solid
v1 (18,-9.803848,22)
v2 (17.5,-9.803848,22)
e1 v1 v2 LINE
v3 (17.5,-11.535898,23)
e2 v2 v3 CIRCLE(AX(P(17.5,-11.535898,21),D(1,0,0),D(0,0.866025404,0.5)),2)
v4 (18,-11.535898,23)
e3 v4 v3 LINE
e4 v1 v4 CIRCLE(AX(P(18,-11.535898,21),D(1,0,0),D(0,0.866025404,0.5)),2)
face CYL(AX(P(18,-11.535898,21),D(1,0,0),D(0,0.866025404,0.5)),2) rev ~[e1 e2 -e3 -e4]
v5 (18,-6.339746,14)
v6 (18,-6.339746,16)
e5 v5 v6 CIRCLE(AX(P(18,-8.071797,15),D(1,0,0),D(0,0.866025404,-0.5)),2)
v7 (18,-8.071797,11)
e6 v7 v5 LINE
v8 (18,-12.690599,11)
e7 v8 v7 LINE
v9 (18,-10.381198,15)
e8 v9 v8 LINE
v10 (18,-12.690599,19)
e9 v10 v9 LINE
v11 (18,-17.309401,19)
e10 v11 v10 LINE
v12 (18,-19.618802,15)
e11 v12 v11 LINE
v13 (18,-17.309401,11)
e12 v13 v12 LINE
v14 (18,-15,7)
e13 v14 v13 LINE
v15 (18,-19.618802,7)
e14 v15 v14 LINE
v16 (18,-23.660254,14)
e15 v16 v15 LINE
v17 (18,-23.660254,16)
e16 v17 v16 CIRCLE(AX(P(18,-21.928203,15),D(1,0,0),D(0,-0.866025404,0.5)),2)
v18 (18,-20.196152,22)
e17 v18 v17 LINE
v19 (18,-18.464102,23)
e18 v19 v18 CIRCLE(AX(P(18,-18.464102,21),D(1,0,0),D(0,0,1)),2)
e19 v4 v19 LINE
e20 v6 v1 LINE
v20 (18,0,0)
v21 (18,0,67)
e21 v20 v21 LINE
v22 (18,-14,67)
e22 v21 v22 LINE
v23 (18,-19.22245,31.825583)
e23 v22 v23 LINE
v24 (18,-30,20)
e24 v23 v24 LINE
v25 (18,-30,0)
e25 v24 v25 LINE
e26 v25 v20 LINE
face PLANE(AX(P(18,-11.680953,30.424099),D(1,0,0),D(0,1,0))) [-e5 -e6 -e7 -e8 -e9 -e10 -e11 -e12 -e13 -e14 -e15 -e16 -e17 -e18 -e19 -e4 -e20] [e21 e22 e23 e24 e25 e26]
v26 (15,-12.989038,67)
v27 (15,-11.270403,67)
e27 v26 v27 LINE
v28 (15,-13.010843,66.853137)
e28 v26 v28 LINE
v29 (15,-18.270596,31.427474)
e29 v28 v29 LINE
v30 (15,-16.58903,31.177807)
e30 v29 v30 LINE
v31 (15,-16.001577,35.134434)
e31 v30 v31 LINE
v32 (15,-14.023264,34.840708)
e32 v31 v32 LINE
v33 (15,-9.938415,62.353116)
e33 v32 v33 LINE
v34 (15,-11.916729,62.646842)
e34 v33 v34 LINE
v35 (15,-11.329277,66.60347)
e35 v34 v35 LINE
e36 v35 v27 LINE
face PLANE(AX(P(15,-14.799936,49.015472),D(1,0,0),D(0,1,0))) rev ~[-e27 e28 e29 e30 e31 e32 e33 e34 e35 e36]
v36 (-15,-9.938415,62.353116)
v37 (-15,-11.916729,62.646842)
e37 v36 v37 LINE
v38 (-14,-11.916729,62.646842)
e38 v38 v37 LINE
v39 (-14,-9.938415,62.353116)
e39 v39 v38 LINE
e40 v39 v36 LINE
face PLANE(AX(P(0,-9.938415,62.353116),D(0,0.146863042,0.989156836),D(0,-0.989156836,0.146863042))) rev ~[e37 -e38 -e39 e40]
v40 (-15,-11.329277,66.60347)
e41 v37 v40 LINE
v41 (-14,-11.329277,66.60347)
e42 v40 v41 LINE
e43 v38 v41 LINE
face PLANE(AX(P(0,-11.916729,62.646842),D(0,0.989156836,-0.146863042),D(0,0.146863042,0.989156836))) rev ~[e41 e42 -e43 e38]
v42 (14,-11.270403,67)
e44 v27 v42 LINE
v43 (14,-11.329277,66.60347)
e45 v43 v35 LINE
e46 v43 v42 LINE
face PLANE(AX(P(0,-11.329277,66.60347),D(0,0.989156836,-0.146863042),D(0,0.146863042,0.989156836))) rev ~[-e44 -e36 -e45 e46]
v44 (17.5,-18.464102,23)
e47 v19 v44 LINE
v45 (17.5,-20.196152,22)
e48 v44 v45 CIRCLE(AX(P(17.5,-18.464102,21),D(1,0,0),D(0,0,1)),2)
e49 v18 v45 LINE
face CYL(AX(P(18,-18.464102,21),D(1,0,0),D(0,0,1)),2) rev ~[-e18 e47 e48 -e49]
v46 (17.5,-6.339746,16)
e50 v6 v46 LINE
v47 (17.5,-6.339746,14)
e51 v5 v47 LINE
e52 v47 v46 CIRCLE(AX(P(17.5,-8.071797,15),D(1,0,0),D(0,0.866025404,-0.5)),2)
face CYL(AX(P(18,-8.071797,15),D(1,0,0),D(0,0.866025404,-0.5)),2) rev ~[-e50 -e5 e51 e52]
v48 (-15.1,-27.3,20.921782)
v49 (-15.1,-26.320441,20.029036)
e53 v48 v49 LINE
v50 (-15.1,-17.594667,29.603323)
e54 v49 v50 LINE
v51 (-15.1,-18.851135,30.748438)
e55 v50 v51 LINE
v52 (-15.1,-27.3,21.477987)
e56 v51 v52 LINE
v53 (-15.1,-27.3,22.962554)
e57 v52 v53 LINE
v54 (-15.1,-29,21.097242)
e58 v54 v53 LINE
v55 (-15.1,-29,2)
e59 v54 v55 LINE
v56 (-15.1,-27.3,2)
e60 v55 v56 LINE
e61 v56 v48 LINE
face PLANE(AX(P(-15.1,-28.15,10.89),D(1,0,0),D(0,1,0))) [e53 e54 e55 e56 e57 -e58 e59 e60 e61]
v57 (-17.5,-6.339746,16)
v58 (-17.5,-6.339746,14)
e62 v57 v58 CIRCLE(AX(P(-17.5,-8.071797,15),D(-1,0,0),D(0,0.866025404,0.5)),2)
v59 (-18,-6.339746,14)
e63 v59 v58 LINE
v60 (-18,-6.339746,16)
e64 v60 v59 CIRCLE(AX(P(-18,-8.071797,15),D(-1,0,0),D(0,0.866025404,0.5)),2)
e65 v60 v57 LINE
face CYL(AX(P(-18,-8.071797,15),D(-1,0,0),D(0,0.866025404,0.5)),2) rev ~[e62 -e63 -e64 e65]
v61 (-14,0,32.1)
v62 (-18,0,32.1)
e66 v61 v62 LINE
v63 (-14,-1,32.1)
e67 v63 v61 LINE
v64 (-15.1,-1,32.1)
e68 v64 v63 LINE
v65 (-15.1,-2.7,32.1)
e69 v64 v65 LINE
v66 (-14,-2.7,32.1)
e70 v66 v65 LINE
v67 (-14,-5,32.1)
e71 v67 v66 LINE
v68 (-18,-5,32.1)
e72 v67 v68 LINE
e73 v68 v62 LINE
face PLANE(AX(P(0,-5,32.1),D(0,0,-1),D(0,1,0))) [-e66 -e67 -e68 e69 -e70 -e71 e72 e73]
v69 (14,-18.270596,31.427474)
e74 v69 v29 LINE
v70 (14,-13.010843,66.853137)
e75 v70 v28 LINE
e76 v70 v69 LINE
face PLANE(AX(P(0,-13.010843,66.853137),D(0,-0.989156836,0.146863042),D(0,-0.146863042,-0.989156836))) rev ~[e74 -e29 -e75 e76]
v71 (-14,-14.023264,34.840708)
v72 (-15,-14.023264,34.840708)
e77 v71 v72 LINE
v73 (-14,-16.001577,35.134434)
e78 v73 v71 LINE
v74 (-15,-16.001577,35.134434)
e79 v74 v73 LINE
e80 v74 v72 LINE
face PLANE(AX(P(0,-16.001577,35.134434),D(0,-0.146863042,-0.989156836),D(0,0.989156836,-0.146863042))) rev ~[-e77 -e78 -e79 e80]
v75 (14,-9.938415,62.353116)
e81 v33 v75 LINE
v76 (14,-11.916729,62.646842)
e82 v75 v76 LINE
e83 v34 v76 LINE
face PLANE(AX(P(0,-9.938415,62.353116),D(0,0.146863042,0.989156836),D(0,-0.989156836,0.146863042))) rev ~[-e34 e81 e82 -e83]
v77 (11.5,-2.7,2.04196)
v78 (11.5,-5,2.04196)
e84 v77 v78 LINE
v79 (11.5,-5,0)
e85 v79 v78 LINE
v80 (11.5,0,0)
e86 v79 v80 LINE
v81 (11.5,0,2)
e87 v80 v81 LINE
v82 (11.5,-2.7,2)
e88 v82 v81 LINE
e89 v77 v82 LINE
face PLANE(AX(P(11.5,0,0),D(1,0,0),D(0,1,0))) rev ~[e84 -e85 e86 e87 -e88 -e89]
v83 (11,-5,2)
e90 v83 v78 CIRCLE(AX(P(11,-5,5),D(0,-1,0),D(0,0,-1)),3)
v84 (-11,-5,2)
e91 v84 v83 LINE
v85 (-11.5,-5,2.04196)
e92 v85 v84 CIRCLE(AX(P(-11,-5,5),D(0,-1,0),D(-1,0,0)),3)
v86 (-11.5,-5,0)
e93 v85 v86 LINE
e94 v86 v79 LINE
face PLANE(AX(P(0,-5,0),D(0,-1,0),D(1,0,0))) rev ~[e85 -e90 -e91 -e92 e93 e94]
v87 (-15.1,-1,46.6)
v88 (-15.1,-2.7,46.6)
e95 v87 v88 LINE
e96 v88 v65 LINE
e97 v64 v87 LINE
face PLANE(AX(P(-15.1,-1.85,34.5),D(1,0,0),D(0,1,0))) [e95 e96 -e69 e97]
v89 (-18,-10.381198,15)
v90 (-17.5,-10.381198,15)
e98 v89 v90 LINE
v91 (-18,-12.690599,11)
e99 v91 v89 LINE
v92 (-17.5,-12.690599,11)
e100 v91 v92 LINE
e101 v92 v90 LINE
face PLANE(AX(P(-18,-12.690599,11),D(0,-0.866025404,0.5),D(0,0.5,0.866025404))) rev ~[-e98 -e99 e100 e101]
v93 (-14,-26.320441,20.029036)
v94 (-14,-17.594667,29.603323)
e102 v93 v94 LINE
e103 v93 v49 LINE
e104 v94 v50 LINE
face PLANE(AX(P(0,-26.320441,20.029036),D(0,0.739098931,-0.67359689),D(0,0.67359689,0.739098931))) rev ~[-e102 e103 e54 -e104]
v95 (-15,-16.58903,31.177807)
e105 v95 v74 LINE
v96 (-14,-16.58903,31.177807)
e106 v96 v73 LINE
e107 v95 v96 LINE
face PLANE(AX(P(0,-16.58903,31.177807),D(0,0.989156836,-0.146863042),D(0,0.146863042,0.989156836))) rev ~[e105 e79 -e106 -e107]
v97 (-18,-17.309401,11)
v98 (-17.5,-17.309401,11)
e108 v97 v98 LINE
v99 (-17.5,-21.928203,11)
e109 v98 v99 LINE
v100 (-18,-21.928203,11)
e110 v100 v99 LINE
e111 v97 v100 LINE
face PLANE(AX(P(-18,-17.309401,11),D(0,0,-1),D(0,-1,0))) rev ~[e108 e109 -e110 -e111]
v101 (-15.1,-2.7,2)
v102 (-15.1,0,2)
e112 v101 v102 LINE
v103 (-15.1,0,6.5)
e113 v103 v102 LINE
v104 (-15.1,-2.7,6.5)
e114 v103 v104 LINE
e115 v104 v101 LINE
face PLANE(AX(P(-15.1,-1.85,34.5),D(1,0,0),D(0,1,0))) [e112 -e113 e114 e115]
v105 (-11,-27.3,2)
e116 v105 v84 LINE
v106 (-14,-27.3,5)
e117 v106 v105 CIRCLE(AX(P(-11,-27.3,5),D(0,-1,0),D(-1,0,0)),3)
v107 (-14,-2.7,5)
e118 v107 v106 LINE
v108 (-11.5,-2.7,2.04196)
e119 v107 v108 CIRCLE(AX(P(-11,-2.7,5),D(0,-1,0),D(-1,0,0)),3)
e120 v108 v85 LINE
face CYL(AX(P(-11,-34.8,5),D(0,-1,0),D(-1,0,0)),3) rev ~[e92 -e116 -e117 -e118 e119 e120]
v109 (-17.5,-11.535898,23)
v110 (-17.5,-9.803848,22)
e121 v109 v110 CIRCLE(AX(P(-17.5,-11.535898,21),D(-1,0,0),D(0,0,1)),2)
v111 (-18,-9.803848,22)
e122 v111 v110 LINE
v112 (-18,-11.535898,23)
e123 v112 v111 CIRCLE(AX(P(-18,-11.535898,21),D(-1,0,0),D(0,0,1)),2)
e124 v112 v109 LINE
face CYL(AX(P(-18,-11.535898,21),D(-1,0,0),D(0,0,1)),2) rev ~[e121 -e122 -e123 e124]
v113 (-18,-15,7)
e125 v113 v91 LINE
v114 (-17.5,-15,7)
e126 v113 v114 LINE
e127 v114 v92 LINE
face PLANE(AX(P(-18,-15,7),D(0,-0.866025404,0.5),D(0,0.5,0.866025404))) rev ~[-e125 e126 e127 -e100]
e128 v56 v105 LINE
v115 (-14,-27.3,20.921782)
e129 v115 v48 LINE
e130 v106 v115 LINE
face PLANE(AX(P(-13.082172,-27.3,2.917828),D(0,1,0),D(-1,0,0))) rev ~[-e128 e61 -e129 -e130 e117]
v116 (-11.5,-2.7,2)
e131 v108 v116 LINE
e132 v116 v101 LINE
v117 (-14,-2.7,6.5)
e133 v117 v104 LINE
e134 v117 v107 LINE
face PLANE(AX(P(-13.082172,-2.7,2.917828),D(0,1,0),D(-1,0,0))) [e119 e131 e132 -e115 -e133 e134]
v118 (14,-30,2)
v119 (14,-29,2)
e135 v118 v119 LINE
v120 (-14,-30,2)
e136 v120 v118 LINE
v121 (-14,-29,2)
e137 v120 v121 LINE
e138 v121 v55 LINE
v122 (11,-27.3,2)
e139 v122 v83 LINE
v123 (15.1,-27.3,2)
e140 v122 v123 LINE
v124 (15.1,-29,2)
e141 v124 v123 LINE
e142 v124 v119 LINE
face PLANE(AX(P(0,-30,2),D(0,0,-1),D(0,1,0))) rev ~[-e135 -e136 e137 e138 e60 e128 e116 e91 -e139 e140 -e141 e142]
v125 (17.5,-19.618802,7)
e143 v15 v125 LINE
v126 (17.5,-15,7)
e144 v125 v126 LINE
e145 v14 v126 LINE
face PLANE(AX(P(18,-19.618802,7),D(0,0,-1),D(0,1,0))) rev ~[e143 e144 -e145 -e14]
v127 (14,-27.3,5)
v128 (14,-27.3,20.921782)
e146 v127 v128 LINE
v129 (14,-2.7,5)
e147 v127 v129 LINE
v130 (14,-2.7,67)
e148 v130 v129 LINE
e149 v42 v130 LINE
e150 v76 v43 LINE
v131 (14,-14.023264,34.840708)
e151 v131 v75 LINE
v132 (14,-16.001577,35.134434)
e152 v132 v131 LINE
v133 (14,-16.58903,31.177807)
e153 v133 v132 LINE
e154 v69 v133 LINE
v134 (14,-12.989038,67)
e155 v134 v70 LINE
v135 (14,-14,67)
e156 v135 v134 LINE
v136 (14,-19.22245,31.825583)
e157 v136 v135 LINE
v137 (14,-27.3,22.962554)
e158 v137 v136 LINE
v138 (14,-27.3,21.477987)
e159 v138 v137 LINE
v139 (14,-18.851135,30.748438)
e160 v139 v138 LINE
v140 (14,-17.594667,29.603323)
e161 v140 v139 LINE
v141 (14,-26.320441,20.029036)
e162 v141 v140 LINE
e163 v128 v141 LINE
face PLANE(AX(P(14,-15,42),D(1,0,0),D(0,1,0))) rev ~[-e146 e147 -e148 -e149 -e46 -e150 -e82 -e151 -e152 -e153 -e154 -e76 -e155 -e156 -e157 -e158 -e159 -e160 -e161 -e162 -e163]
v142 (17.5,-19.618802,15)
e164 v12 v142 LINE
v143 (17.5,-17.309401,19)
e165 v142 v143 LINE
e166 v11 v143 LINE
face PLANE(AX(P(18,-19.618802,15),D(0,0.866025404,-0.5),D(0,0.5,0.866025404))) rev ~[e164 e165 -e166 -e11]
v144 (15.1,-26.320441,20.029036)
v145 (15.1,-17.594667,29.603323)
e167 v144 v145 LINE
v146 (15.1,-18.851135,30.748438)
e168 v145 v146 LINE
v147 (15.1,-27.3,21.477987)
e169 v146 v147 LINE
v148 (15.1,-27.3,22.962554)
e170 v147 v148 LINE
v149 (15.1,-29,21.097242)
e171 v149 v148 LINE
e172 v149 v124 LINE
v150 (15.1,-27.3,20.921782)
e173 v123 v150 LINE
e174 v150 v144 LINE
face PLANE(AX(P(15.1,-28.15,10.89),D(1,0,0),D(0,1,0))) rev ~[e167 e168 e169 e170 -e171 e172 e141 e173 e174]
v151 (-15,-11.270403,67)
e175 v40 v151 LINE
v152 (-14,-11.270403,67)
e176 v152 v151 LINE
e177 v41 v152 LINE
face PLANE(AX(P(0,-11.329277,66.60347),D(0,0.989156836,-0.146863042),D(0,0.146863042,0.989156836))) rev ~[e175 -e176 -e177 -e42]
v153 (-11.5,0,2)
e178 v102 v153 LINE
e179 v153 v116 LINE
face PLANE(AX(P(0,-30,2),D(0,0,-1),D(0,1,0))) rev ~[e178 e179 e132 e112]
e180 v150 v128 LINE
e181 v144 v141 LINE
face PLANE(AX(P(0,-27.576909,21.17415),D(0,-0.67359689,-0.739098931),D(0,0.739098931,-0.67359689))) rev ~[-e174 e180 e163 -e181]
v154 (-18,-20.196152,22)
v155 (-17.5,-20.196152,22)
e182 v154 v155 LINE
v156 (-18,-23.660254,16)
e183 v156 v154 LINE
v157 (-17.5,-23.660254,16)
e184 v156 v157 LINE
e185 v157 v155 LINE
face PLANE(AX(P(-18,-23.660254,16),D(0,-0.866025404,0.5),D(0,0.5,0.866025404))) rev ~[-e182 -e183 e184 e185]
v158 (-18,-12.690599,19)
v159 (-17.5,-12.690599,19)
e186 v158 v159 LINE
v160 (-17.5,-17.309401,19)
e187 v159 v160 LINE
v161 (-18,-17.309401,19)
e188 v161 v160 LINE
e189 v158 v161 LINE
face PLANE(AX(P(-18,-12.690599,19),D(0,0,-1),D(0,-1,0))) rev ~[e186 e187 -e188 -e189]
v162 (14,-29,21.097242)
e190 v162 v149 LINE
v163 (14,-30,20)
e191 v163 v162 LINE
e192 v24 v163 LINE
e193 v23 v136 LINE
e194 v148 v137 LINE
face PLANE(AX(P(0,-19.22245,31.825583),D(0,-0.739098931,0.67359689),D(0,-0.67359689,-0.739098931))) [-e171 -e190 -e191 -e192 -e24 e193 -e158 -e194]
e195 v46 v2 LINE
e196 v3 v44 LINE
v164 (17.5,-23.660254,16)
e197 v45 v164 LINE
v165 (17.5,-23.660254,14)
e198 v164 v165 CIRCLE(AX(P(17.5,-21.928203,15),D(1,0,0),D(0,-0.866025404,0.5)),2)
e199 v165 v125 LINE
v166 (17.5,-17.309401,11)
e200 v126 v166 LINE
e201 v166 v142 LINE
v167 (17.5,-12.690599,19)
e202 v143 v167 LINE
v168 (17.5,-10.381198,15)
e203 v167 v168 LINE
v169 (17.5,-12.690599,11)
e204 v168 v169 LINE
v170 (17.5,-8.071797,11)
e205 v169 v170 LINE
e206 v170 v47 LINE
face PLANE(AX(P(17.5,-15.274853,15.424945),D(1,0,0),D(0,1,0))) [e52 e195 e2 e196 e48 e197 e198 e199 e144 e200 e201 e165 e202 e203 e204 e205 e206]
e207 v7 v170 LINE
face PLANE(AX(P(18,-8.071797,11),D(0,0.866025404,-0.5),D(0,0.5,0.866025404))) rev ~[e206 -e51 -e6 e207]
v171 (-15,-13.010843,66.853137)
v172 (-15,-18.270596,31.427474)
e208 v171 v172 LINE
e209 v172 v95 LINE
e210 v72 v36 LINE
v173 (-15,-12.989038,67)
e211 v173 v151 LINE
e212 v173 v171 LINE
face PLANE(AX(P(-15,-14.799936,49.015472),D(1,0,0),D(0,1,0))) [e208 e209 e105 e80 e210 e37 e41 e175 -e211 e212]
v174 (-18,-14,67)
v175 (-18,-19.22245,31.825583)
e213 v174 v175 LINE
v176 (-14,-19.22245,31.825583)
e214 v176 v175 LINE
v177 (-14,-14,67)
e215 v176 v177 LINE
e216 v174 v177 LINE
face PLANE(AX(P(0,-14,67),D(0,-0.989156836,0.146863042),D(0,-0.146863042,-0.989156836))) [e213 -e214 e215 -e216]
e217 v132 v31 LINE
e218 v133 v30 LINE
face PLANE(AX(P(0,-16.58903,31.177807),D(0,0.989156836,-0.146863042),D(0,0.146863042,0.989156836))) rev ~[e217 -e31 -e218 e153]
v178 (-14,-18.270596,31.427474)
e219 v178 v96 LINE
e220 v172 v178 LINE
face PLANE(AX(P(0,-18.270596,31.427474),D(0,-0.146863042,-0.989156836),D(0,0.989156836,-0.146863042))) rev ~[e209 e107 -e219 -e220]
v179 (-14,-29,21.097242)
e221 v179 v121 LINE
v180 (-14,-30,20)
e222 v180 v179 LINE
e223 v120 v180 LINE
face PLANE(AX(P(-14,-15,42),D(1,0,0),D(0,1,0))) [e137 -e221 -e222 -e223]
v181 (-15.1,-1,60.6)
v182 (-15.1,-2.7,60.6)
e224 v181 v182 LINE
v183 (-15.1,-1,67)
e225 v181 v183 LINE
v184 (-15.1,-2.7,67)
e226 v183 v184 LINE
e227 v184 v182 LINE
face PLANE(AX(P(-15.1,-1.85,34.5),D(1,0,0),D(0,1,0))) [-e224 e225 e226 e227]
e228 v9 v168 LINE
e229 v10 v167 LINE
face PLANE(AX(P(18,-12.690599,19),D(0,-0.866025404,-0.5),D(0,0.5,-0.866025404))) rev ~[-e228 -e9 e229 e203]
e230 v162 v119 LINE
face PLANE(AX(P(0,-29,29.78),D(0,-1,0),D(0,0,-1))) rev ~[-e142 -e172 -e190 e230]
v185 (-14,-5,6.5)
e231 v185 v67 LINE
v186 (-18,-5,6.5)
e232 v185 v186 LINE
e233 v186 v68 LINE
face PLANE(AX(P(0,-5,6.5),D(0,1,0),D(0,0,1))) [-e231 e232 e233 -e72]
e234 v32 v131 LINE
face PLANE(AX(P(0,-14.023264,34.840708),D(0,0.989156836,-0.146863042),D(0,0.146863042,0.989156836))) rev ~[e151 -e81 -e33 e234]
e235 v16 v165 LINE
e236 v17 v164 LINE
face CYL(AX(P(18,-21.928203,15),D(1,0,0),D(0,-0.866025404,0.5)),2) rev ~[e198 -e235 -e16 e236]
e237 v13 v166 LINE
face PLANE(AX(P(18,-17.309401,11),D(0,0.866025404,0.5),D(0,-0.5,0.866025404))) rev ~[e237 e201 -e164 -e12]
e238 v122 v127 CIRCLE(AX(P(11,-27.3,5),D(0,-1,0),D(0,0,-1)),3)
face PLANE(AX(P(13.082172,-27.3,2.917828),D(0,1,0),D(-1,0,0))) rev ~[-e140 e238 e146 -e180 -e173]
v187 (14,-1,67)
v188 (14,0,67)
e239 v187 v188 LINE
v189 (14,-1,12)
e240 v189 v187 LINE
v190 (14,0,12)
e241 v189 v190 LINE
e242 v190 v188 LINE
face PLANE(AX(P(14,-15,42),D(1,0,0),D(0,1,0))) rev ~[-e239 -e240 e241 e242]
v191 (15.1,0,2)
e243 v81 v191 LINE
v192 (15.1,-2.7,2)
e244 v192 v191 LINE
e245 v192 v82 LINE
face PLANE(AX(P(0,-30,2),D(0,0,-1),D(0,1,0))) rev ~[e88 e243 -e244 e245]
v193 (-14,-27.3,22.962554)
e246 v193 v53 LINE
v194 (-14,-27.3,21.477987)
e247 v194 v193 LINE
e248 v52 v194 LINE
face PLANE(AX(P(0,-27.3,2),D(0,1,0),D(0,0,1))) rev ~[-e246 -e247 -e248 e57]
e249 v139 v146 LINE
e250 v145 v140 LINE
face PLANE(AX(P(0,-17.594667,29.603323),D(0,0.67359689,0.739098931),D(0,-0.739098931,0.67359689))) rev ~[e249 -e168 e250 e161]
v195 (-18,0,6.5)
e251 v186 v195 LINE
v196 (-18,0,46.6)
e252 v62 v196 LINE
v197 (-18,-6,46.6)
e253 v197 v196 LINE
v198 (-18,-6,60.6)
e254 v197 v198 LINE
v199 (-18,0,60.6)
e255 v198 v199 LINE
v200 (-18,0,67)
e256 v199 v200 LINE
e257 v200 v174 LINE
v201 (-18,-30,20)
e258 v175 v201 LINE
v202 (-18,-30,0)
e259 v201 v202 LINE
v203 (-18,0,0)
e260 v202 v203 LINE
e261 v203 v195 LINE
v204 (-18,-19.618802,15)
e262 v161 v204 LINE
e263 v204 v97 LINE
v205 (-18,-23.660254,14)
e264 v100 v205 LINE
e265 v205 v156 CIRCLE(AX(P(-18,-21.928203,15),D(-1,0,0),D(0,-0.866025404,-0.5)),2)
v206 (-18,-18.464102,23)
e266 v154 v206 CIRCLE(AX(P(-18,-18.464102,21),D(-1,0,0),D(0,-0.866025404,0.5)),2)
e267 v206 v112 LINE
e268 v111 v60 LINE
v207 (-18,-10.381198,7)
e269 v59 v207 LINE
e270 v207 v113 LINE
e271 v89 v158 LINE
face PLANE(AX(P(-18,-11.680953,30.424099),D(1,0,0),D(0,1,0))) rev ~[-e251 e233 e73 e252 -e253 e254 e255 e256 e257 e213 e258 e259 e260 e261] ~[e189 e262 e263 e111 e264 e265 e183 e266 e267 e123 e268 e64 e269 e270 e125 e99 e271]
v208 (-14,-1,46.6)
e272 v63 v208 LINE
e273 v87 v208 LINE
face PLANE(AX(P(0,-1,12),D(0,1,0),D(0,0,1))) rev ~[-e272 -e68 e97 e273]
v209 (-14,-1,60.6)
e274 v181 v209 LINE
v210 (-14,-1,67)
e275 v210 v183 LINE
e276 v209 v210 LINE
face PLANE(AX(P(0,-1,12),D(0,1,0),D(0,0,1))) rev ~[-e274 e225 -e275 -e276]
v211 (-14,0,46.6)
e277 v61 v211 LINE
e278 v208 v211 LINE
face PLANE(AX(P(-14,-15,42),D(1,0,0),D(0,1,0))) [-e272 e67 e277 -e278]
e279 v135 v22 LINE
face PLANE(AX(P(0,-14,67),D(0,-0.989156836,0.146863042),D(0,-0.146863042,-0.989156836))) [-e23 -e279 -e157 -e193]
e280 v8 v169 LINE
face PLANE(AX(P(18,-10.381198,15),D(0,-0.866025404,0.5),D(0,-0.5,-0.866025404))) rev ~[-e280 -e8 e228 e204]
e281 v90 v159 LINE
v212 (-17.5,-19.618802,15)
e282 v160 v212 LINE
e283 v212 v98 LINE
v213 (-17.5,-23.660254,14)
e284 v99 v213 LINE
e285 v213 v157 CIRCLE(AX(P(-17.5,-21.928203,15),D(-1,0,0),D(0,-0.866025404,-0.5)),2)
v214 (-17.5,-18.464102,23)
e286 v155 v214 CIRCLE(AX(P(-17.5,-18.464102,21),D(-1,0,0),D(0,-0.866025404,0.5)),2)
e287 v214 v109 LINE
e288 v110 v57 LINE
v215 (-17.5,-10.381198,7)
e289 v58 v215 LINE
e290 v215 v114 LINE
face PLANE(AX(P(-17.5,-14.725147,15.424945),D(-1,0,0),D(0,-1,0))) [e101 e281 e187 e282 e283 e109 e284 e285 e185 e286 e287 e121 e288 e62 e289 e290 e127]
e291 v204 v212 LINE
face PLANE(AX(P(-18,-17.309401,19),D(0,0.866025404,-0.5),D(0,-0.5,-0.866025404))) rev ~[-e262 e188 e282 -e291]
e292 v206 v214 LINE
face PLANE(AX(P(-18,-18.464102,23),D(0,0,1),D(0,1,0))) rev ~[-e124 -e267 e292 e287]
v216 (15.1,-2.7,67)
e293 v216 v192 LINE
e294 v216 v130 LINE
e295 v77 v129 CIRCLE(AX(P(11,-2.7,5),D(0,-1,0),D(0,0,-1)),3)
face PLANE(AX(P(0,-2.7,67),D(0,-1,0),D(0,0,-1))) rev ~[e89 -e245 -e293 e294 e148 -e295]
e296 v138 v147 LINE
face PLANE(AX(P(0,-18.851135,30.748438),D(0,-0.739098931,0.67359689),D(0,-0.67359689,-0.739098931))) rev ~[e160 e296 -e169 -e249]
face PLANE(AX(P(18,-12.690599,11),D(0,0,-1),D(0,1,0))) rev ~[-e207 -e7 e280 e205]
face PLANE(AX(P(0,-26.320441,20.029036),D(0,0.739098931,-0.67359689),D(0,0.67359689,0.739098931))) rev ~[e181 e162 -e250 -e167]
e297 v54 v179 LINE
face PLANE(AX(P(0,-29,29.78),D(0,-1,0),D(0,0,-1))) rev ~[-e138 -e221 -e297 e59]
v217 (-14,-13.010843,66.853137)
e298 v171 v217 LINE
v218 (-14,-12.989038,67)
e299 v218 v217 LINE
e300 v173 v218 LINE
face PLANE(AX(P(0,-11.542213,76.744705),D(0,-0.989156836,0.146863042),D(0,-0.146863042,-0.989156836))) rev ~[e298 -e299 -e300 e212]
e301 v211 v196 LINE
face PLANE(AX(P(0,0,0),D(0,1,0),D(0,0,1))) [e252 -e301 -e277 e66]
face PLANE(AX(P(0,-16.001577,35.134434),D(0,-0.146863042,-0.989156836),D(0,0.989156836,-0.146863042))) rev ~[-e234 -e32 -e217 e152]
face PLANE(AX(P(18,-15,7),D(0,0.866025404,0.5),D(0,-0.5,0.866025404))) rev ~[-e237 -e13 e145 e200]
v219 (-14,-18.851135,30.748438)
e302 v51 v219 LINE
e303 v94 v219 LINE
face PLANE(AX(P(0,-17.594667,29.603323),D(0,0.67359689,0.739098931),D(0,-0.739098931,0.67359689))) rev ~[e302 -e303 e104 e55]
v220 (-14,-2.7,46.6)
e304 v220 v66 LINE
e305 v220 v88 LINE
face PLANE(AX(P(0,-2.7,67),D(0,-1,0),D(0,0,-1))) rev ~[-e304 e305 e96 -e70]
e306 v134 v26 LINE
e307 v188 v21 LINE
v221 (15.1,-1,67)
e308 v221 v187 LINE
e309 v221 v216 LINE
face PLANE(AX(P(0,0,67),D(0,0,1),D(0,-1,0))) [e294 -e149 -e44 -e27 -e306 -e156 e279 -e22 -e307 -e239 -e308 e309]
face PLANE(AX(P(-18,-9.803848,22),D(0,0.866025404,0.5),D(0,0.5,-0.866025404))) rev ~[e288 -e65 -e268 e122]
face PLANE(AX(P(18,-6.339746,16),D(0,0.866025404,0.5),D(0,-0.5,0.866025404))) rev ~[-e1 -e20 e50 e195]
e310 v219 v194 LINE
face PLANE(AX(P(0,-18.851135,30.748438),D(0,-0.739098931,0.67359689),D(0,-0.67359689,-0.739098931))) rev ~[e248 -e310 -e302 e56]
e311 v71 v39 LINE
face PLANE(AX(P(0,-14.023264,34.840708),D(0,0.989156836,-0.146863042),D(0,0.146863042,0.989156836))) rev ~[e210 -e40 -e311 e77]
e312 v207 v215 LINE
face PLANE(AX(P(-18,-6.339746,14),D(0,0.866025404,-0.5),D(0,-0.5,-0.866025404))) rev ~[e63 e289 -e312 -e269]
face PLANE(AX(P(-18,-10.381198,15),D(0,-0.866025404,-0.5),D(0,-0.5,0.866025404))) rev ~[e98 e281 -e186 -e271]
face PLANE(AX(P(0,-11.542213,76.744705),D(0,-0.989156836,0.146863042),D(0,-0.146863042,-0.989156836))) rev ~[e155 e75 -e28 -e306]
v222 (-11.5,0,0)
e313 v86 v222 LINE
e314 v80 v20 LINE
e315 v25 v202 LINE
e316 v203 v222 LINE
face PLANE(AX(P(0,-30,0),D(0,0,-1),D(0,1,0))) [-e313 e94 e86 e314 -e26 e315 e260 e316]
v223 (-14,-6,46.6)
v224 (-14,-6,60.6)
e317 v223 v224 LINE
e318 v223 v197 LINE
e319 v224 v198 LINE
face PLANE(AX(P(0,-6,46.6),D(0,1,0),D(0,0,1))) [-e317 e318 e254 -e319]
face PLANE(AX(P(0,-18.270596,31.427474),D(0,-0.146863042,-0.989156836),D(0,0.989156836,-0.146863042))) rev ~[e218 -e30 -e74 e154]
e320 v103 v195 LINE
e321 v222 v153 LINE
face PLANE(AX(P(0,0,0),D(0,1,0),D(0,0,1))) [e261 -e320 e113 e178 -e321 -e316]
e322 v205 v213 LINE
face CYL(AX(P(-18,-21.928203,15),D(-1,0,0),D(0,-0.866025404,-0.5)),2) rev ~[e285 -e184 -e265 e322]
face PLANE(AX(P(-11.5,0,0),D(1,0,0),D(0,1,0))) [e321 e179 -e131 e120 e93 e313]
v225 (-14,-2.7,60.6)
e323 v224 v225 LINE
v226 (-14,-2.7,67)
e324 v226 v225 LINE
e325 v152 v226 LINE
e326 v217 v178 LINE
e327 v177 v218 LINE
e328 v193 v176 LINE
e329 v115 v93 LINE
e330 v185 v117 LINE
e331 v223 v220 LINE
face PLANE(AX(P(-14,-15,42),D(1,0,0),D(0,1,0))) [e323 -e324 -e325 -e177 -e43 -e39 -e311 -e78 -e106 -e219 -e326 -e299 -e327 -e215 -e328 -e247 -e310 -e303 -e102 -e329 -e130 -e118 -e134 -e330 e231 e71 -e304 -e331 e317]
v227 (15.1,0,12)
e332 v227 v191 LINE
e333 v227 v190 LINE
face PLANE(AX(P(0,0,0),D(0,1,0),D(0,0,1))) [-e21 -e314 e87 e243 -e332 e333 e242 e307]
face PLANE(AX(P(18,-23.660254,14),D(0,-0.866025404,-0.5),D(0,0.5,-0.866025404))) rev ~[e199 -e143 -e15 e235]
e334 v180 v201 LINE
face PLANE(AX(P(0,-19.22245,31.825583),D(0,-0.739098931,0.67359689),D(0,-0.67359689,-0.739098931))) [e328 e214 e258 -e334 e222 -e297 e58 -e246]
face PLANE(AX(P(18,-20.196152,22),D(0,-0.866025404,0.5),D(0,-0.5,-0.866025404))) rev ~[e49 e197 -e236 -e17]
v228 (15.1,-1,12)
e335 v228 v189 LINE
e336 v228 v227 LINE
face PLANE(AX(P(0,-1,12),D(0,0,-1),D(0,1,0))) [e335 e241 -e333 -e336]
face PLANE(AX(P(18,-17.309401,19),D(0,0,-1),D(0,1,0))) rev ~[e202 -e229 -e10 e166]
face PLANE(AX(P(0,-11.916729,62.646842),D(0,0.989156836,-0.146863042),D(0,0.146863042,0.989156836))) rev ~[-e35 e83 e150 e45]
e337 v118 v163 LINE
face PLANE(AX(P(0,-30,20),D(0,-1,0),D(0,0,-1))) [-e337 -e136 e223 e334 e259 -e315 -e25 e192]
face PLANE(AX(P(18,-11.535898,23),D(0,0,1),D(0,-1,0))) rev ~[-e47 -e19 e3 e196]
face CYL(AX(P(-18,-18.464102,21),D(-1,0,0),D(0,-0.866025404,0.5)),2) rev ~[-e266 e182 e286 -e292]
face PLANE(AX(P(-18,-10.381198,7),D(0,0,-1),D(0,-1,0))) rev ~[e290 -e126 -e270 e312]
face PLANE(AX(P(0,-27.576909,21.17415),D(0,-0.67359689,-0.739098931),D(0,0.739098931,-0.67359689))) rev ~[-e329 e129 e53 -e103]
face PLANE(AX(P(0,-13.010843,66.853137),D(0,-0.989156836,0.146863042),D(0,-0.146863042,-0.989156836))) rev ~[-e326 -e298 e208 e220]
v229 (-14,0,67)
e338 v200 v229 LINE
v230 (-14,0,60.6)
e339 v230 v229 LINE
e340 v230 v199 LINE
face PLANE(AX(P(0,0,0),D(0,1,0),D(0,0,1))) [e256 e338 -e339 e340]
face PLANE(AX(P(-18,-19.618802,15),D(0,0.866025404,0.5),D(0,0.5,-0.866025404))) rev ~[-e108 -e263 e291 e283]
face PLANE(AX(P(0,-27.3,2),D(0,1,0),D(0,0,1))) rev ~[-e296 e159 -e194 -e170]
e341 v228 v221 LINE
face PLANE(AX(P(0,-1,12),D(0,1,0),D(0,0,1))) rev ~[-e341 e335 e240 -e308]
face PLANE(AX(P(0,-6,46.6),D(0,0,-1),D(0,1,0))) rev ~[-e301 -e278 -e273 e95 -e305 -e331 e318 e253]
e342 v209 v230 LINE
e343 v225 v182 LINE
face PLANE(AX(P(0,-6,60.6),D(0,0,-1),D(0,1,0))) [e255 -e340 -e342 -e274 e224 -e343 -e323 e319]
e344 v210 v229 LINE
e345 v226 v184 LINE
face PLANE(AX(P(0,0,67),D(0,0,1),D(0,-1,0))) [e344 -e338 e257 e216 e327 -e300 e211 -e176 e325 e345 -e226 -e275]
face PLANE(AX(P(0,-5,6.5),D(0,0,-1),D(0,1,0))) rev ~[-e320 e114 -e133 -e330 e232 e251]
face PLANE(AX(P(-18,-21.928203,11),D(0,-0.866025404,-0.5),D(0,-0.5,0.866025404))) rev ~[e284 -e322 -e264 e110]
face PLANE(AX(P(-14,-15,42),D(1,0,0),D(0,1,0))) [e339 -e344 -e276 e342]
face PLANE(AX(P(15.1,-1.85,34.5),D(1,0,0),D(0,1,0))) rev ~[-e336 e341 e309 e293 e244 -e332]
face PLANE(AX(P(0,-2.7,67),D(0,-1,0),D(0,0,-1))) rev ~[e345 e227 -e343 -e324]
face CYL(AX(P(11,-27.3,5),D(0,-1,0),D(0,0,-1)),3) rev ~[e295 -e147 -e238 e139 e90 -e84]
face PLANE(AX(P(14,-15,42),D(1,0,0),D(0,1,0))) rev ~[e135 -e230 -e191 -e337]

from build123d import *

# Parameters (mm, degrees)
F1_DEPTH     = 18
F2_W         = 30
F2_H         = 80
F3_DEPTH     = 14
F4_W         = 5
F4_H         = 25.6
F4_W_2       = 6
F4_H_2       = 14
F5_DEPTH     = 25
F6_W         = 5
F6_H         = 5
F7_DEPTH     = 11.5
F8_W         = 10
F8_H         = 10
F9_DEPTH     = 15.1
F10_W        = 1.7
F10_H        = 17.78
F10_H_2      = 10
F11_DEPTH    = 15.1
F13_DEPTH    = 15.1
F15_DEPTH    = 15
F17_DEPTH    = 0.5
F19_DEPTH    = 0.5
F20_T4_DEPTH = 32.1
F20_T9_DEPTH = 32.1
F21_T4_DEPTH = 32.1
F21_T9_DEPTH = 24.6


# Not quite as in the source:
# - a fillet or chamfer that OpenCascade refuses, or shapes differently, is made with other operations: its cross-section is extruded or revolved along the edge and cut away or added


with BuildPart() as f1:
    # F0 (on Right) → F1 (new body, symmetric)
    with BuildSketch(Plane.YZ):
        Polygon((-30, 0), (0, 0), (0, 67), (-14, 67), (-19.2224497622, 31.8255828978), (-30, 20), align=None)
    extrude(amount=F1_DEPTH, both=True)

    # F2 (on Right) → F3 (cut, symmetric)
    with BuildSketch(Plane.YZ):
        with Locations((-15, 42)):
            Rectangle(F2_W, F2_H)
    extrude(amount=F3_DEPTH, both=True, mode=Mode.SUBTRACT)

    # F4 (on Right) → F5 (cut)
    with BuildSketch(Plane.YZ):
        with Locations((-2.5, 19.3)):
            Rectangle(F4_W, F4_H)
        with Locations((-3, 53.6)):
            Rectangle(F4_W_2, F4_H_2)
    extrude(amount=-F5_DEPTH, mode=Mode.SUBTRACT)

    # F6 (on Right) → F7 (cut, symmetric)
    with BuildSketch(Plane.YZ):
        with Locations((-2.5, 2.5)):
            Rectangle(F6_W, F6_H)
    extrude(amount=F7_DEPTH, both=True, mode=Mode.SUBTRACT)

    # F8 (on Right) → F9 (cut, symmetric)
    with BuildSketch(Plane.YZ):
        Polygon((-2.7, 67), (-2.7, 2), (-1, 2), (-1, 12), (-1, 67), align=None)
        with Locations((4, 7)):
            Rectangle(F8_W, F8_H)
    extrude(amount=F9_DEPTH, both=True, mode=Mode.SUBTRACT)

    # F10 (on Right) → F11 (cut, symmetric)
    with BuildSketch(Plane.YZ):
        with Locations((-28.15, 10.89)):
            Rectangle(F10_W, F10_H)
        with Locations((-28.15, 24.78)):
            Rectangle(F10_W, F10_H_2)
    extrude(amount=F11_DEPTH, both=True, mode=Mode.SUBTRACT)

    # F12 (on Right) → F13 (cut, symmetric)
    with BuildSketch(Plane.YZ):
        Polygon((-17.5946665501, 29.6033232788), (-18.851134733, 30.7484379915), (-27.5769088442, 21.1741504379), (-26.3204406613, 20.0290357252), align=None)
    extrude(amount=F13_DEPTH, both=True, mode=Mode.SUBTRACT)

    # F14 (on Right) → F15 (cut, symmetric)
    with BuildSketch(Plane.YZ):
        Polygon((-11.9167287085, 62.6468424419), (-11.3292765417, 66.6034697875), (-13.0108431636, 66.8531369583), (-18.2705961384, 31.4274740197), (-16.5890295165, 31.1778068488), (-16.0015773498, 35.1344341944), align=None)
        Polygon((-13.0108431636, 66.8531369583), (-11.3292765417, 66.6034697875), (-9.8606461249, 76.4950381514), (-11.5422127468, 76.7447053223), align=None)
        Polygon((-9.9384150357, 62.3531163585), (-11.9167287085, 62.6468424419), (-16.0015773498, 35.1344341944), (-14.023263677, 34.840708111), align=None)
    extrude(amount=F15_DEPTH, both=True, mode=Mode.SUBTRACT)

    # F16 (on face) → F17 (cut)
    with BuildSketch(Plane.YZ.offset(18)):
        with BuildLine():
            Line((-19.6188021535, 7), (-15, 7))
            Line((-15, 7), (-17.3094010768, 11))
            Line((-17.3094010768, 11), (-19.6188021535, 15))
            Line((-19.6188021535, 15), (-17.3094010768, 19))
            Line((-17.3094010768, 19), (-12.6905989232, 19))
            Line((-12.6905989232, 19), (-10.3811978465, 15))
            Line((-10.3811978465, 15), (-12.6905989232, 11))
            Line((-12.6905989232, 11), (-8.0717967697, 11))
            Line((-8.0717967697, 11), (-6.3397459622, 14))
            ThreePointArc((-6.3397459622, 14), (-6.0717967697, 15), (-6.3397459622, 16))
            Line((-6.3397459622, 16), (-9.8038475773, 22))
            ThreePointArc((-9.8038475773, 22), (-10.5358983849, 22.7320508076), (-11.5358983849, 23))
            Line((-11.5358983849, 23), (-18.4641016151, 23))
            ThreePointArc((-18.4641016151, 23), (-19.4641016151, 22.7320508076), (-20.1961524227, 22))
            Line((-20.1961524227, 22), (-23.6602540378, 16))
            ThreePointArc((-23.6602540378, 16), (-23.9282032303, 15), (-23.6602540378, 14))
            Line((-23.6602540378, 14), (-19.6188021535, 7))
        make_face()
    extrude(amount=-F17_DEPTH, mode=Mode.SUBTRACT)

    # F18 (on face) → F19 (cut)
    with BuildSketch(Plane(origin=(-18, 0, 0), x_dir=(0, -1, 0), z_dir=(-1, 0, 0))):
        with BuildLine():
            Line((18.4641016151, 23), (11.5358983849, 23))
            ThreePointArc((11.5358983849, 23), (10.5358983849, 22.7320508076), (9.8038475773, 22))
            Line((9.8038475773, 22), (6.3397459622, 16))
            ThreePointArc((6.3397459622, 16), (6.0717967697, 15), (6.3397459622, 14))
            Line((6.3397459622, 14), (10.3811978465, 7))
            Line((10.3811978465, 7), (15, 7))
            Line((15, 7), (12.6905989232, 11))
            Line((12.6905989232, 11), (10.3811978465, 15))
            Line((10.3811978465, 15), (12.6905989232, 19))
            Line((12.6905989232, 19), (17.3094010768, 19))
            Line((17.3094010768, 19), (19.6188021535, 15))
            Line((19.6188021535, 15), (17.3094010768, 11))
            Line((17.3094010768, 11), (21.9282032303, 11))
            Line((21.9282032303, 11), (23.6602540378, 14))
            ThreePointArc((23.6602540378, 14), (23.9282032303, 15), (23.6602540378, 16))
            Line((23.6602540378, 16), (20.1961524227, 22))
            ThreePointArc((20.1961524227, 22), (19.4641016151, 22.7320508076), (18.4641016151, 23))
        make_face()
    extrude(amount=-F19_DEPTH, mode=Mode.SUBTRACT)

    # F20: fillet of radius 3 on 1 edges, made by hand


with BuildPart() as f20_tool2:
    # F20_s3 → F20_t4 (new body)
    with BuildSketch(Plane.XZ.offset(27.3)):
        with BuildLine():
            ThreePointArc((-14, 5), (-13.1213203436, 2.8786796564), (-11, 2))
            Line((-11, 2), (-14, 2))
            Line((-14, 2), (-14, 5))
        make_face()
    extrude(amount=-F20_T4_DEPTH)

    split(bisect_by=Plane.XZ.offset(5), keep=Keep.TOP)


with BuildPart() as f1_1:
    add(f1.part)

    # F20_t1: union F20_tool2
    add(f20_tool2.part)


with BuildPart() as f20_tool7:
    # F20_s8 → F20_t9 (new body)
    with BuildSketch(Plane.XZ.offset(34.8)):
        with BuildLine():
            ThreePointArc((-14, 5), (-13.1213203436, 2.8786796564), (-11, 2))
            Line((-11, 2), (-14, 2))
            Line((-14, 2), (-14, 5))
        make_face()
    extrude(amount=-F20_T9_DEPTH)

    split(bisect_by=Plane.YZ.offset(-11.5), keep=Keep.BOTTOM)

    split(bisect_by=Plane.XZ.offset(5), keep=Keep.BOTTOM)


with BuildPart() as f1_2:
    add(f1_1.part)

    # F20_t6: union F20_tool7
    add(f20_tool7.part)

    # F21: fillet of radius 3 on 1 edges, made by hand


with BuildPart() as f21_tool2:
    # F21_s3 → F21_t4 (new body)
    with BuildSketch(Plane.XZ.offset(27.3)):
        with BuildLine():
            ThreePointArc((11, 2), (13.1213203436, 2.8786796564), (14, 5))
            Line((14, 5), (14, 2))
            Line((14, 2), (11, 2))
        make_face()
    extrude(amount=-F21_T4_DEPTH)

    split(bisect_by=Plane.XZ.offset(5), keep=Keep.TOP)


with BuildPart() as f1_3:
    add(f1_2.part)

    # F21_t1: union F21_tool2
    add(f21_tool2.part)


with BuildPart() as f21_tool7:
    # F21_s8 → F21_t9 (new body)
    with BuildSketch(Plane.XZ.offset(27.3)):
        with BuildLine():
            ThreePointArc((11, 2), (13.1213203436, 2.8786796564), (14, 5))
            Line((14, 5), (14, 2))
            Line((14, 2), (11, 2))
        make_face()
    extrude(amount=-F21_T9_DEPTH)

    split(bisect_by=Plane.YZ.offset(11.5), keep=Keep.TOP)


with BuildPart() as f1_4:
    add(f1_3.part)

    # F21_t6: union F21_tool7
    add(f21_tool7.part)


solid = f1_4.part
